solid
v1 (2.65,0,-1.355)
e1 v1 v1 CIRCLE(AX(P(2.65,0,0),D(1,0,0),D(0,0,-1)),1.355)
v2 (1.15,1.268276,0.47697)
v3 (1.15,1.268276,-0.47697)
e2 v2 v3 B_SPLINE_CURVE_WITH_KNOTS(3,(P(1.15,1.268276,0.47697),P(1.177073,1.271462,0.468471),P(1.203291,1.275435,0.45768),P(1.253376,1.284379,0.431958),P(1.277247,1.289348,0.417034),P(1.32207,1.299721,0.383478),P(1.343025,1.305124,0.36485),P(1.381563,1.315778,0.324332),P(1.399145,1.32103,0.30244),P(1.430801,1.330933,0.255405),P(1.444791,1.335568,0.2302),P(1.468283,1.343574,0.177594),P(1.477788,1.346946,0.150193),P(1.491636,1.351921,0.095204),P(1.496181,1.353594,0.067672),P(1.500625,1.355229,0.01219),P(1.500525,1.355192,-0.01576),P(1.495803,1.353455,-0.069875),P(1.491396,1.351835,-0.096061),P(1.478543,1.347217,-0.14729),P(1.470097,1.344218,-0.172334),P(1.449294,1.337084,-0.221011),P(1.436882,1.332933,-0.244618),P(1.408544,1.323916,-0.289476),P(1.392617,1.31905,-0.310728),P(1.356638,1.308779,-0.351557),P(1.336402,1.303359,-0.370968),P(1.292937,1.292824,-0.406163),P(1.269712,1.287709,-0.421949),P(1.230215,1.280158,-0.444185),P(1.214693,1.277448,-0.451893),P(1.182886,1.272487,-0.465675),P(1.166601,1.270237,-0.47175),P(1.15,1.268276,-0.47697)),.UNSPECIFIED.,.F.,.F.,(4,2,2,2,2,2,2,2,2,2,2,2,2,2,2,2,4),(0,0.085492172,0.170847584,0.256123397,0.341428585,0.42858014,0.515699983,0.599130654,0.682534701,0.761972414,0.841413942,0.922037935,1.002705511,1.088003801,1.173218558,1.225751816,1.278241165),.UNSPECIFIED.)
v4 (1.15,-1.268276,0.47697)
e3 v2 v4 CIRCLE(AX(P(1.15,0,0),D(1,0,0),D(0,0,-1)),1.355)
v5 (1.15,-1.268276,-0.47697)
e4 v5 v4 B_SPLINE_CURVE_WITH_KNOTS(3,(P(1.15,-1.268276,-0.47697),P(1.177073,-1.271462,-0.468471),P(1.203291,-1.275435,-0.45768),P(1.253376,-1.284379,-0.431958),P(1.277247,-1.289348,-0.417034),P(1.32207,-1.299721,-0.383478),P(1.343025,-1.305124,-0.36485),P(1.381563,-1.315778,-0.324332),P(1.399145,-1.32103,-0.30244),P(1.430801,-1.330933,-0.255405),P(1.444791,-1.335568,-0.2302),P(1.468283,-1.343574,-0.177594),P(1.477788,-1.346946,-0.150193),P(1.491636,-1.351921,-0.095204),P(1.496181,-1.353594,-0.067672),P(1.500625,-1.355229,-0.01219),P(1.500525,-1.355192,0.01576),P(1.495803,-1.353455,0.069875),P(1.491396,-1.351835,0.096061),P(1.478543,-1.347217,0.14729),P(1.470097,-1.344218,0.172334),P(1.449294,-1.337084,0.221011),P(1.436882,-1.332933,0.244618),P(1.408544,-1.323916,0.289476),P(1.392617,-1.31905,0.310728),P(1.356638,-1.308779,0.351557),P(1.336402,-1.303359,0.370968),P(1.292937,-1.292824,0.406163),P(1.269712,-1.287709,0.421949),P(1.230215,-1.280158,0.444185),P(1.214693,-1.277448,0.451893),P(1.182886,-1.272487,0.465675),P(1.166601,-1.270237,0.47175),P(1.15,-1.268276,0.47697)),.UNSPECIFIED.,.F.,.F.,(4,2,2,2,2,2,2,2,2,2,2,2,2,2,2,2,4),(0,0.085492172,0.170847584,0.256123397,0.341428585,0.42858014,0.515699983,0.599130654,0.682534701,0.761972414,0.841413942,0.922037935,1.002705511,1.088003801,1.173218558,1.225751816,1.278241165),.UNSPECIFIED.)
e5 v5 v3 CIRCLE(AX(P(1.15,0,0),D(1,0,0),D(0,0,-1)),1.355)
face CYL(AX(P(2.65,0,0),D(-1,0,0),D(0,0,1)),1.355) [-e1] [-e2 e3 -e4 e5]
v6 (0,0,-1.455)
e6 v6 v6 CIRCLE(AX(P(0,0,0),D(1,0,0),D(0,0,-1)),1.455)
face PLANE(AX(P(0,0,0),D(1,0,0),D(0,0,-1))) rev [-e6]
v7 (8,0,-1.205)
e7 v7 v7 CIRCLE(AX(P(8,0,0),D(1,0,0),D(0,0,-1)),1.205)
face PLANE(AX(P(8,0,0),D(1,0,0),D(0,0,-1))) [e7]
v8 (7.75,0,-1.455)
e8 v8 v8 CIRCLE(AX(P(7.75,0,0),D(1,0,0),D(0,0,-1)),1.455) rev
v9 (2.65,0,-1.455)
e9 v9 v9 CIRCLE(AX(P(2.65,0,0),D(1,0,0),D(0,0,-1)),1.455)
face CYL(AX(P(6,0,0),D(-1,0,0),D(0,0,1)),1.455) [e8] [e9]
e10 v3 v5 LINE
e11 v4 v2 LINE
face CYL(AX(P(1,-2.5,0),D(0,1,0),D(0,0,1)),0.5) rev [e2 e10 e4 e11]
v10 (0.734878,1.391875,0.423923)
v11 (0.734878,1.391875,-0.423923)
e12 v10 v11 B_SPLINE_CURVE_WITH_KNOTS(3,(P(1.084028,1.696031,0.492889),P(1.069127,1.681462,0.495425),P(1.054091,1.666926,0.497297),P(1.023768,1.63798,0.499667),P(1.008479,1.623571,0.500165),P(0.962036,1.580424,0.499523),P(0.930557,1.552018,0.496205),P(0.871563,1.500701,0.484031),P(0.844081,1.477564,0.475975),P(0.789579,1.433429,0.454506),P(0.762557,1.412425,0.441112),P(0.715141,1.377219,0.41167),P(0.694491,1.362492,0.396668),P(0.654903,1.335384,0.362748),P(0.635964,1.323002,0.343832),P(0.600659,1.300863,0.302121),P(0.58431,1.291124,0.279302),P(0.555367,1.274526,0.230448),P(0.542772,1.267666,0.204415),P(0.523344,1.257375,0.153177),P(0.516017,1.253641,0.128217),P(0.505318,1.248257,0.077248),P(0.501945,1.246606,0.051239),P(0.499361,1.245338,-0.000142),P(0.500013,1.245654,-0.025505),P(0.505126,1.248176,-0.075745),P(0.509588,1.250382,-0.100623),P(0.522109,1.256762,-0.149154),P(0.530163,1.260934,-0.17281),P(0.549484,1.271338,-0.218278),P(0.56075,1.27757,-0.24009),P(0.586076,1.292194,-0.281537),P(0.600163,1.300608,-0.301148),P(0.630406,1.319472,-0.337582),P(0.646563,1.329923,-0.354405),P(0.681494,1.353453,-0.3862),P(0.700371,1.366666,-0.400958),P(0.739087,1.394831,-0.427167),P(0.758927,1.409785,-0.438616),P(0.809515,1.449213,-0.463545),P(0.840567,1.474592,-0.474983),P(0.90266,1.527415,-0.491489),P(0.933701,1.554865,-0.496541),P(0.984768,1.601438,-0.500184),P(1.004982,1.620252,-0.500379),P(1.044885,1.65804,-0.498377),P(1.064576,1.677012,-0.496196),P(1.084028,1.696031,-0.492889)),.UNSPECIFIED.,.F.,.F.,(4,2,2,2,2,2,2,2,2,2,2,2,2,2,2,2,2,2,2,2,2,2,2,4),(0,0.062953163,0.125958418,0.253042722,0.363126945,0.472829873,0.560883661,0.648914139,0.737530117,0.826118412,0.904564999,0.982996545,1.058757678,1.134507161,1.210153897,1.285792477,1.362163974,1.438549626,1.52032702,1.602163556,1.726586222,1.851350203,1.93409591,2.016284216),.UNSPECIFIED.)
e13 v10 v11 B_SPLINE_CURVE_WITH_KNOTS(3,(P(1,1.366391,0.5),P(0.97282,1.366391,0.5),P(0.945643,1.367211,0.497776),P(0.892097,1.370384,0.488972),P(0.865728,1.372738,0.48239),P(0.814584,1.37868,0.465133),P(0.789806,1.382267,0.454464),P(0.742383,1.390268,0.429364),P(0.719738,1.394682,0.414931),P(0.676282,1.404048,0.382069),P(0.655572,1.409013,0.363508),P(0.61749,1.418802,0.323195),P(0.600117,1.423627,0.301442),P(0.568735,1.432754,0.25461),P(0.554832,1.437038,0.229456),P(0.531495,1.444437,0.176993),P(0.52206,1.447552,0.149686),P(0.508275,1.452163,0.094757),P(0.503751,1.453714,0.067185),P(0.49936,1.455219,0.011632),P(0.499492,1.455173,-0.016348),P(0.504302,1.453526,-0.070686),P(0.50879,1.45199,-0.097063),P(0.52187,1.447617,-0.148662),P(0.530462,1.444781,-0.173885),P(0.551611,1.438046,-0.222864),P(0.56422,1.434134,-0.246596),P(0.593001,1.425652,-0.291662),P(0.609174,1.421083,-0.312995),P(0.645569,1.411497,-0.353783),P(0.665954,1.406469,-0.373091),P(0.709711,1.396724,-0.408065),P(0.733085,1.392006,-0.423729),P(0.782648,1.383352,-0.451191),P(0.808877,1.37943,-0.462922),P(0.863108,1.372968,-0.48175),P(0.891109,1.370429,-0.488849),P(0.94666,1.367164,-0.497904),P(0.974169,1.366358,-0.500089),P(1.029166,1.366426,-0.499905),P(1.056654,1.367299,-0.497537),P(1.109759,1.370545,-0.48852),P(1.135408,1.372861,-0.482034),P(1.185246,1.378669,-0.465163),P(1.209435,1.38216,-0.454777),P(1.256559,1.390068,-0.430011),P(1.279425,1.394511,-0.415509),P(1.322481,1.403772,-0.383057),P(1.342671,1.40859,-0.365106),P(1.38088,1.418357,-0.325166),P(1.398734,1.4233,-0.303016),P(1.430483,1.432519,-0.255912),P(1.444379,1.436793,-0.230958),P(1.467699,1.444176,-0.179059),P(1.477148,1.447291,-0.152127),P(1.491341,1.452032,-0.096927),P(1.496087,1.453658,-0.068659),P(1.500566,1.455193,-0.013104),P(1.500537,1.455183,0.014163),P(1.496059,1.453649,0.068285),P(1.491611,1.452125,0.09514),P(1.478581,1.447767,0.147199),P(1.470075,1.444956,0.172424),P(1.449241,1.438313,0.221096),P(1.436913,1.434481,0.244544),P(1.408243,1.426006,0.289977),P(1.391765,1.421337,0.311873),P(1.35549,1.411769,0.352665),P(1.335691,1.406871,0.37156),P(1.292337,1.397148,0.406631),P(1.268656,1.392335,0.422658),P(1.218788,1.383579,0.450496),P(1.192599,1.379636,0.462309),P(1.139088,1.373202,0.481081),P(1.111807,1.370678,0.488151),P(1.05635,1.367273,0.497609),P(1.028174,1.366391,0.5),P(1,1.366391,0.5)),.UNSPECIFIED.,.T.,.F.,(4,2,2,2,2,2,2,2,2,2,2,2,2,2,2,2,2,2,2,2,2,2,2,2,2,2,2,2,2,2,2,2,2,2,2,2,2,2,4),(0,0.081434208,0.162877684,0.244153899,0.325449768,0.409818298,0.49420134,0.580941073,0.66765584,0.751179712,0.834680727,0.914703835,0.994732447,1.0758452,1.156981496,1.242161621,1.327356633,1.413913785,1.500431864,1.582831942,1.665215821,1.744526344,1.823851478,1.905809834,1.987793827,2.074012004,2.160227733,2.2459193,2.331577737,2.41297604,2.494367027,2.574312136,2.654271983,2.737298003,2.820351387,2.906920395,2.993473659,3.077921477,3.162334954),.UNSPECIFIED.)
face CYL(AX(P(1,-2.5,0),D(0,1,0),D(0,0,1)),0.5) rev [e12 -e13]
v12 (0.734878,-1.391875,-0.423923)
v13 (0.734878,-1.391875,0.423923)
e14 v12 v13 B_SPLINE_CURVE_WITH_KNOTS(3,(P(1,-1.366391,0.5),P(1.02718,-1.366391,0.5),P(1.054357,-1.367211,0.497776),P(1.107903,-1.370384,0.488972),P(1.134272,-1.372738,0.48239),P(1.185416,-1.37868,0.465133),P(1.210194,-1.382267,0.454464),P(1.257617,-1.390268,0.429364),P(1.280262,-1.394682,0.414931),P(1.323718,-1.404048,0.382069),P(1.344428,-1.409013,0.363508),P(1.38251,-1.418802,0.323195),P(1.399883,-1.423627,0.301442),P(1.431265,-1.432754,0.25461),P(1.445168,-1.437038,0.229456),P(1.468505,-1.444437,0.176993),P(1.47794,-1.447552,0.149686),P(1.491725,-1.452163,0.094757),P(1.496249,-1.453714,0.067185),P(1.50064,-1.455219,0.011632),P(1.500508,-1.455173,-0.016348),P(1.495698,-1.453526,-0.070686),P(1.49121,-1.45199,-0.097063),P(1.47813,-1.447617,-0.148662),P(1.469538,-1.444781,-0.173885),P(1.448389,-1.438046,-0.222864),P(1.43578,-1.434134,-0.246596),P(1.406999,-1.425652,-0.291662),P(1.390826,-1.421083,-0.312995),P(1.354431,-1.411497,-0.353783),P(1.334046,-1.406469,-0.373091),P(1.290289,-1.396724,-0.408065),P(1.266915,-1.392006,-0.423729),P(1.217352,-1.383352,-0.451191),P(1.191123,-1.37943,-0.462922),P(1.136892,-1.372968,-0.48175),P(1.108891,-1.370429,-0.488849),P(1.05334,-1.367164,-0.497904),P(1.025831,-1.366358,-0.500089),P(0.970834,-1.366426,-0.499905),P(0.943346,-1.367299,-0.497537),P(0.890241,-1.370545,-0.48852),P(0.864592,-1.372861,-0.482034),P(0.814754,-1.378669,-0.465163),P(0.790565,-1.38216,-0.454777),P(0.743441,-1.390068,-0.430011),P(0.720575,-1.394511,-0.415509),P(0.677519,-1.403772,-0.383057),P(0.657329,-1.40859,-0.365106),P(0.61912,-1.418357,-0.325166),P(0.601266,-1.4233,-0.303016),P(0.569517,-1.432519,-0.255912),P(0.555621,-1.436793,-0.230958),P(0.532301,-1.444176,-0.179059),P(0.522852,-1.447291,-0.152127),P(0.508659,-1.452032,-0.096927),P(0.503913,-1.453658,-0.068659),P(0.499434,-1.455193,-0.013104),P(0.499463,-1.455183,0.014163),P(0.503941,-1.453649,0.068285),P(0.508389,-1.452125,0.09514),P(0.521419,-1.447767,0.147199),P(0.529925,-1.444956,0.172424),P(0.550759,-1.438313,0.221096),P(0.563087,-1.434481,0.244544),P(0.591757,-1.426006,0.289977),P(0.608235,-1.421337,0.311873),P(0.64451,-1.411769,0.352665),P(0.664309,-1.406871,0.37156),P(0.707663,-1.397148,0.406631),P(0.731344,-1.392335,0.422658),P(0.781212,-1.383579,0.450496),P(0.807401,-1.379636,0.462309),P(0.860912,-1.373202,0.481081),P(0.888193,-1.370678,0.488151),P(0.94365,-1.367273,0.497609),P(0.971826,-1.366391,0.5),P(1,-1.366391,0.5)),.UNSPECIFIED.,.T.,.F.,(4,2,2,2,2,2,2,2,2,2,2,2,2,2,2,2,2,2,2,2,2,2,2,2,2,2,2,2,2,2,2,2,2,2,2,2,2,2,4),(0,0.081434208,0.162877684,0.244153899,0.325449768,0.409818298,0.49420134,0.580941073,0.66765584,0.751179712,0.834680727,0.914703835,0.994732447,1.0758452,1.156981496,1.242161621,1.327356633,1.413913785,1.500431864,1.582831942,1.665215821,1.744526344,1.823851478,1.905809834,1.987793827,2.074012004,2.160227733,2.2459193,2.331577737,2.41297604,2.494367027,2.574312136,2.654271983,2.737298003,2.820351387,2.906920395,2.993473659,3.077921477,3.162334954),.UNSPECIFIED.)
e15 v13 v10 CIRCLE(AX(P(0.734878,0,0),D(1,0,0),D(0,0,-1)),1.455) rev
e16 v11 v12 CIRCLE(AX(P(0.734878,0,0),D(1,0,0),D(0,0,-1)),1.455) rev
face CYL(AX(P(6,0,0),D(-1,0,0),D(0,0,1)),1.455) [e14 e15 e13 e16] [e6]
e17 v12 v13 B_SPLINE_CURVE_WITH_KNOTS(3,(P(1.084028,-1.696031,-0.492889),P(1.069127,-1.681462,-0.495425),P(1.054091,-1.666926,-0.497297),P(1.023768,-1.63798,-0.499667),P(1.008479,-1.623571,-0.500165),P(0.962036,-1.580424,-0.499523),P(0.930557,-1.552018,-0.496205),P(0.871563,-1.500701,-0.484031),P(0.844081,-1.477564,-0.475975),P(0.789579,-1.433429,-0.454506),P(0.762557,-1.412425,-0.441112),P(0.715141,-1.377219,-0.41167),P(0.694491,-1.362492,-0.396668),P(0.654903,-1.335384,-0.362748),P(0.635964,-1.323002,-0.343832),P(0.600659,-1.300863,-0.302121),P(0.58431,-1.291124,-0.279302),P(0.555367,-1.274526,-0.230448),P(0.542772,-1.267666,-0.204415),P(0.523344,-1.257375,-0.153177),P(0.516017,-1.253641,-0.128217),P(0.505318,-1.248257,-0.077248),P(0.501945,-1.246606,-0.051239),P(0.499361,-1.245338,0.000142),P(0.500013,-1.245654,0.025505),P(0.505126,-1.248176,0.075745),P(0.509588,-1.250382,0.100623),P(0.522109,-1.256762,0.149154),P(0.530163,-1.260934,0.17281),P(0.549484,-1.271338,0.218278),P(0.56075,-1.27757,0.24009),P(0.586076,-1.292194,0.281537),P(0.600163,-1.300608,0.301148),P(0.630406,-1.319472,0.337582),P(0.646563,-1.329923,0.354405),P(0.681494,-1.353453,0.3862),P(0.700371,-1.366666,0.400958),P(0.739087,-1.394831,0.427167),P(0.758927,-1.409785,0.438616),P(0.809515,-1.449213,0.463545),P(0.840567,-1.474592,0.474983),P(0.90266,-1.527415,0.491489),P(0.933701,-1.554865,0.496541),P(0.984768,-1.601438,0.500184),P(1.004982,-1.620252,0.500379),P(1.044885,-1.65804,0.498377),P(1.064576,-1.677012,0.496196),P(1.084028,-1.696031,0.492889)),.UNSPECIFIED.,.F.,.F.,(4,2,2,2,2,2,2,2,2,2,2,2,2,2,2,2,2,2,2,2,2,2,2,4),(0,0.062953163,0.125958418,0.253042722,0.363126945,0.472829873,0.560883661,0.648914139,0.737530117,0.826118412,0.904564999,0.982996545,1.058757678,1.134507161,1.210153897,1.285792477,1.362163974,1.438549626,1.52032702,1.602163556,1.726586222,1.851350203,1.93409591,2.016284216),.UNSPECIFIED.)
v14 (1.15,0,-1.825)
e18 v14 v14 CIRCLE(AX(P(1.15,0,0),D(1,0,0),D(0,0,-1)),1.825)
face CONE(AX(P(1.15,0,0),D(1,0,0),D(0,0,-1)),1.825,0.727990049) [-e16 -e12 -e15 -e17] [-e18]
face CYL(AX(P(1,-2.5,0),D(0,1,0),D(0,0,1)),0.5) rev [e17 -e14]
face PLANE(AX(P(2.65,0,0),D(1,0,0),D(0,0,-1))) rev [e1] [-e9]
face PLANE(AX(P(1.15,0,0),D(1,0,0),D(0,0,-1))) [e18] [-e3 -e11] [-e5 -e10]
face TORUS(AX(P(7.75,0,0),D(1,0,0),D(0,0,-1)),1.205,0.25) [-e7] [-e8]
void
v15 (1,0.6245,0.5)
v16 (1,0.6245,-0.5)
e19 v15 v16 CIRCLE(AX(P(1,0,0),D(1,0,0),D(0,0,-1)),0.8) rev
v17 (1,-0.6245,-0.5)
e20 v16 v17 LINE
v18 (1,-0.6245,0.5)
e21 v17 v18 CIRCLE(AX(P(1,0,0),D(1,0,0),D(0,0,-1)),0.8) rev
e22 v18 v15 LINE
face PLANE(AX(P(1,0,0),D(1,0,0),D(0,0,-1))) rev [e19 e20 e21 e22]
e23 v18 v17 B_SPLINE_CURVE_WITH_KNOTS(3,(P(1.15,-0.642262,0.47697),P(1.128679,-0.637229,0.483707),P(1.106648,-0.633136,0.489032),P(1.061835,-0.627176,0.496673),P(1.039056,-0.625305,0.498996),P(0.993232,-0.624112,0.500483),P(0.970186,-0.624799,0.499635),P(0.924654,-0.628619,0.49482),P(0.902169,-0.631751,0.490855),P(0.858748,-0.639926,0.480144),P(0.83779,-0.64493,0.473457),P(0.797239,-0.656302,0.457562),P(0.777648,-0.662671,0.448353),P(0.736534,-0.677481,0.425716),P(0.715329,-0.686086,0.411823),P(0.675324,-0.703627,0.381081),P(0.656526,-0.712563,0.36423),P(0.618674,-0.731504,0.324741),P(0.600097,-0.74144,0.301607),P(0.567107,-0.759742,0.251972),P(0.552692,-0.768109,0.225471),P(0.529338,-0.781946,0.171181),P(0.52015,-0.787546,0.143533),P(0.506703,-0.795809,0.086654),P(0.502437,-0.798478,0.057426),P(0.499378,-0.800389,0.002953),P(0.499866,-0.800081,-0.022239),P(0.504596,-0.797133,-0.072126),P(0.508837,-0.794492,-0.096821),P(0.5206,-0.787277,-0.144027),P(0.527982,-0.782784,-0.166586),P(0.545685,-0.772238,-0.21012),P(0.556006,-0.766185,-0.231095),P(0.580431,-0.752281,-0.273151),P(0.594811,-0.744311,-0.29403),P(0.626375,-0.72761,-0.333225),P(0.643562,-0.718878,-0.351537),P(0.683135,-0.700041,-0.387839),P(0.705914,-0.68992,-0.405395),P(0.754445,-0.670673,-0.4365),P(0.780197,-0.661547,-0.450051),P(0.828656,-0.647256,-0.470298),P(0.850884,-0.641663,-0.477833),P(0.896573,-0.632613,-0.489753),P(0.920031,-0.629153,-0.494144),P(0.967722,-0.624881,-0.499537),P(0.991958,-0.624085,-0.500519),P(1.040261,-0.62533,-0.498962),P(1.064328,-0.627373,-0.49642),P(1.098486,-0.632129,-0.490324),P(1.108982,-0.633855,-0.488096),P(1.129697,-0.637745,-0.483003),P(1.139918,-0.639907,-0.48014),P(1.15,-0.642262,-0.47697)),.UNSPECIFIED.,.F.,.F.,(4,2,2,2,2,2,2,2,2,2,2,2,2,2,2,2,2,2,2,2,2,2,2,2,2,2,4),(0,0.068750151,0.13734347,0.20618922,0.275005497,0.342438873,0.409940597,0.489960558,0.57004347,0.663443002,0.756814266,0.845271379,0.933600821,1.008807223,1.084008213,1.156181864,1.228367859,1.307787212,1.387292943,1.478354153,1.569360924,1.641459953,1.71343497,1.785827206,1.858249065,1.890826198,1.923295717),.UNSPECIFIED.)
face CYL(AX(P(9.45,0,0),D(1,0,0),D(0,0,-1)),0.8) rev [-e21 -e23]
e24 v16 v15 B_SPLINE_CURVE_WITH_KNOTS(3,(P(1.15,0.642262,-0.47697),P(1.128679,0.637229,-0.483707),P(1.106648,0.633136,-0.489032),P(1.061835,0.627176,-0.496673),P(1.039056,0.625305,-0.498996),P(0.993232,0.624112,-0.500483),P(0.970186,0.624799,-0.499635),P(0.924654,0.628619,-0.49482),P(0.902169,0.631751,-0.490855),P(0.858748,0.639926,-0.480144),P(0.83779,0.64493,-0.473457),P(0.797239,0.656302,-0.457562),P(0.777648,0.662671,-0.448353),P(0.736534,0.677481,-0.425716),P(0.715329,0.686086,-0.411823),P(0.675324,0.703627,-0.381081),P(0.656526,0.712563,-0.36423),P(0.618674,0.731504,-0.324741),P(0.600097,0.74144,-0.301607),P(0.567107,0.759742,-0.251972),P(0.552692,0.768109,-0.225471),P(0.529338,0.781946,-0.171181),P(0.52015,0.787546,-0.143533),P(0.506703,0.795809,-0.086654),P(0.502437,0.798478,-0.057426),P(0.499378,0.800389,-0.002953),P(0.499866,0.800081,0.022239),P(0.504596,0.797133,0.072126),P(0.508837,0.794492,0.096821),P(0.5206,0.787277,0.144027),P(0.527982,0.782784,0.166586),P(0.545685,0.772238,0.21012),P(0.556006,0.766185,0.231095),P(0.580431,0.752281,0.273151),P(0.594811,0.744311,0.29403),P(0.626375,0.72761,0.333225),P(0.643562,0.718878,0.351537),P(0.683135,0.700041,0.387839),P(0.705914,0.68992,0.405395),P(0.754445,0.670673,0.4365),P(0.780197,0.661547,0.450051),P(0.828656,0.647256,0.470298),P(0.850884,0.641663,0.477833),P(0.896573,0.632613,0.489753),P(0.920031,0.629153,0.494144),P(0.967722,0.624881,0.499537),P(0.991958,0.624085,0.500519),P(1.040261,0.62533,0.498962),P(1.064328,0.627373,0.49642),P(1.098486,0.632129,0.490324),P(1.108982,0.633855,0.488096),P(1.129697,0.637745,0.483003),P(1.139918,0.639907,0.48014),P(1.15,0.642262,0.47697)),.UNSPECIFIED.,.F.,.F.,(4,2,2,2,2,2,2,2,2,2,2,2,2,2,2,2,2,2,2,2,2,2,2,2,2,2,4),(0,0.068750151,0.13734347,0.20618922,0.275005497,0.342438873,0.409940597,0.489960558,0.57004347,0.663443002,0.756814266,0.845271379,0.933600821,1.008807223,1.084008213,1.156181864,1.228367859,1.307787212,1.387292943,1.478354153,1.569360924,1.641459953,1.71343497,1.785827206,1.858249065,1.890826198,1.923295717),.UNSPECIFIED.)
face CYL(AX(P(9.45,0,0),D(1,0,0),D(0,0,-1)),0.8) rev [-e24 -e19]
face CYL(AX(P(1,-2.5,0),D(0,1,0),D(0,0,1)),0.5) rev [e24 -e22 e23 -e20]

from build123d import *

# Parameters (mm, degrees)
SKETCH2_R               = 1.455
BOSS_EXTRUDE3_DEPTH     = 6
SKETCH3_R               = 2.5
BOSS_EXTRUDE4_DEPTH     = 3
CUT_EXTRUDE1_DEPTH      = 10.669539803
CUT_EXTRUDE1_DEPTH_BACK = 10.669539803
SKETCH4_R               = 0.5
SKETCH6_R               = 1.575
BOSS_EXTRUDE5_DEPTH     = 0.15
CUT_EXTRUDE3_REACH      = 11.67
SKETCH9_R               = 2.5
SKETCH9_R_2             = 1.455
CUT_EXTRUDE4_START      = -1
SKETCH10_R              = 1.455
CUT_EXTRUDE4_DEPTH      = 1
FILLET1_R               = 0.25
SKETCH11_R              = 1.455
SKETCH11_R_2            = 1.355
CUT_EXTRUDE5_DEPTH      = 1.5


with BuildPart() as part:
    # Sketch2 → Boss-Extrude3 (new body)
    with BuildSketch(Plane(origin=(0, 0, 0), x_dir=(0, 0, -1), z_dir=(1, 0, 0))):
        Circle(SKETCH2_R)
    extrude(amount=BOSS_EXTRUDE3_DEPTH)

    # Sketch3 → Boss-Extrude4 (add)
    with BuildSketch(Plane(origin=(6, 0, 0), x_dir=(0, 0, -1), z_dir=(1, 0, 0))):
        Circle(SKETCH3_R)
    extrude(amount=BOSS_EXTRUDE4_DEPTH)

    # Sketch4 → Cut-Extrude1 (cut, two sides: drawn at the far end of the back side and taken through both)
    with BuildSketch(Plane(origin=(0, 0, 0), x_dir=(1, 0, 0), z_dir=(0, 1, 0)).offset(-CUT_EXTRUDE1_DEPTH_BACK)):
        with Locations((1, 0)):
            Circle(SKETCH4_R)
    extrude(amount=CUT_EXTRUDE1_DEPTH + CUT_EXTRUDE1_DEPTH_BACK, mode=Mode.SUBTRACT)

    # Sketch6 → Boss-Extrude5 (add)
    with BuildSketch(Plane.YZ.offset(1)):
        Circle(SKETCH6_R)
    extrude(amount=BOSS_EXTRUDE5_DEPTH)

    # Sketch7 → Revolve1 (revolve)
    with BuildSketch(Plane.XY):
        Polygon((1.15, 1.825), (0, 0.8), (1.15, 0.8), align=None)
    revolve(axis=Axis((9.45, 0, 0), (-1, 0, 0)))

    # Sketch9 → Cut-Extrude3 (cut, up to next)
    with BuildSketch(Plane(origin=(9, 0, 0), x_dir=(0, 0, -1), z_dir=(1, 0, 0)), mode=Mode.PRIVATE) as cut_extrude3_sk1:
        Circle(SKETCH9_R)
        Circle(SKETCH9_R_2, mode=Mode.SUBTRACT)
    cut_extrude3_tool1 = extrude(cut_extrude3_sk1.sketch, amount=-CUT_EXTRUDE3_REACH, mode=Mode.PRIVATE) & part.part
    add(cut_extrude3_tool1.solids().sort_by_distance((9, 0, 2.429289))[0], mode=Mode.SUBTRACT)

    # Sketch10 → Cut-Extrude4 (cut)
    with BuildSketch(Plane(origin=(9, 0, 0), x_dir=(0, 0, -1), z_dir=(1, 0, 0)).offset(CUT_EXTRUDE4_START)):
        Circle(SKETCH10_R)
    extrude(amount=CUT_EXTRUDE4_DEPTH, mode=Mode.SUBTRACT)

    # Fillet1
    fillet1_edges = [part.edges().sort_by_distance(p)[0] for p in [
        (8, 0, 1.455),
    ]]
    fillet(fillet1_edges, radius=FILLET1_R)

    # Sketch11 → Cut-Extrude5 (cut)
    with BuildSketch(Plane(origin=(1.15, 0, 0), x_dir=(0, 0, -1), z_dir=(1, 0, 0))):
        Circle(SKETCH11_R)
        Circle(SKETCH11_R_2, mode=Mode.SUBTRACT)
    extrude(amount=CUT_EXTRUDE5_DEPTH, mode=Mode.SUBTRACT)


solid = part.part
